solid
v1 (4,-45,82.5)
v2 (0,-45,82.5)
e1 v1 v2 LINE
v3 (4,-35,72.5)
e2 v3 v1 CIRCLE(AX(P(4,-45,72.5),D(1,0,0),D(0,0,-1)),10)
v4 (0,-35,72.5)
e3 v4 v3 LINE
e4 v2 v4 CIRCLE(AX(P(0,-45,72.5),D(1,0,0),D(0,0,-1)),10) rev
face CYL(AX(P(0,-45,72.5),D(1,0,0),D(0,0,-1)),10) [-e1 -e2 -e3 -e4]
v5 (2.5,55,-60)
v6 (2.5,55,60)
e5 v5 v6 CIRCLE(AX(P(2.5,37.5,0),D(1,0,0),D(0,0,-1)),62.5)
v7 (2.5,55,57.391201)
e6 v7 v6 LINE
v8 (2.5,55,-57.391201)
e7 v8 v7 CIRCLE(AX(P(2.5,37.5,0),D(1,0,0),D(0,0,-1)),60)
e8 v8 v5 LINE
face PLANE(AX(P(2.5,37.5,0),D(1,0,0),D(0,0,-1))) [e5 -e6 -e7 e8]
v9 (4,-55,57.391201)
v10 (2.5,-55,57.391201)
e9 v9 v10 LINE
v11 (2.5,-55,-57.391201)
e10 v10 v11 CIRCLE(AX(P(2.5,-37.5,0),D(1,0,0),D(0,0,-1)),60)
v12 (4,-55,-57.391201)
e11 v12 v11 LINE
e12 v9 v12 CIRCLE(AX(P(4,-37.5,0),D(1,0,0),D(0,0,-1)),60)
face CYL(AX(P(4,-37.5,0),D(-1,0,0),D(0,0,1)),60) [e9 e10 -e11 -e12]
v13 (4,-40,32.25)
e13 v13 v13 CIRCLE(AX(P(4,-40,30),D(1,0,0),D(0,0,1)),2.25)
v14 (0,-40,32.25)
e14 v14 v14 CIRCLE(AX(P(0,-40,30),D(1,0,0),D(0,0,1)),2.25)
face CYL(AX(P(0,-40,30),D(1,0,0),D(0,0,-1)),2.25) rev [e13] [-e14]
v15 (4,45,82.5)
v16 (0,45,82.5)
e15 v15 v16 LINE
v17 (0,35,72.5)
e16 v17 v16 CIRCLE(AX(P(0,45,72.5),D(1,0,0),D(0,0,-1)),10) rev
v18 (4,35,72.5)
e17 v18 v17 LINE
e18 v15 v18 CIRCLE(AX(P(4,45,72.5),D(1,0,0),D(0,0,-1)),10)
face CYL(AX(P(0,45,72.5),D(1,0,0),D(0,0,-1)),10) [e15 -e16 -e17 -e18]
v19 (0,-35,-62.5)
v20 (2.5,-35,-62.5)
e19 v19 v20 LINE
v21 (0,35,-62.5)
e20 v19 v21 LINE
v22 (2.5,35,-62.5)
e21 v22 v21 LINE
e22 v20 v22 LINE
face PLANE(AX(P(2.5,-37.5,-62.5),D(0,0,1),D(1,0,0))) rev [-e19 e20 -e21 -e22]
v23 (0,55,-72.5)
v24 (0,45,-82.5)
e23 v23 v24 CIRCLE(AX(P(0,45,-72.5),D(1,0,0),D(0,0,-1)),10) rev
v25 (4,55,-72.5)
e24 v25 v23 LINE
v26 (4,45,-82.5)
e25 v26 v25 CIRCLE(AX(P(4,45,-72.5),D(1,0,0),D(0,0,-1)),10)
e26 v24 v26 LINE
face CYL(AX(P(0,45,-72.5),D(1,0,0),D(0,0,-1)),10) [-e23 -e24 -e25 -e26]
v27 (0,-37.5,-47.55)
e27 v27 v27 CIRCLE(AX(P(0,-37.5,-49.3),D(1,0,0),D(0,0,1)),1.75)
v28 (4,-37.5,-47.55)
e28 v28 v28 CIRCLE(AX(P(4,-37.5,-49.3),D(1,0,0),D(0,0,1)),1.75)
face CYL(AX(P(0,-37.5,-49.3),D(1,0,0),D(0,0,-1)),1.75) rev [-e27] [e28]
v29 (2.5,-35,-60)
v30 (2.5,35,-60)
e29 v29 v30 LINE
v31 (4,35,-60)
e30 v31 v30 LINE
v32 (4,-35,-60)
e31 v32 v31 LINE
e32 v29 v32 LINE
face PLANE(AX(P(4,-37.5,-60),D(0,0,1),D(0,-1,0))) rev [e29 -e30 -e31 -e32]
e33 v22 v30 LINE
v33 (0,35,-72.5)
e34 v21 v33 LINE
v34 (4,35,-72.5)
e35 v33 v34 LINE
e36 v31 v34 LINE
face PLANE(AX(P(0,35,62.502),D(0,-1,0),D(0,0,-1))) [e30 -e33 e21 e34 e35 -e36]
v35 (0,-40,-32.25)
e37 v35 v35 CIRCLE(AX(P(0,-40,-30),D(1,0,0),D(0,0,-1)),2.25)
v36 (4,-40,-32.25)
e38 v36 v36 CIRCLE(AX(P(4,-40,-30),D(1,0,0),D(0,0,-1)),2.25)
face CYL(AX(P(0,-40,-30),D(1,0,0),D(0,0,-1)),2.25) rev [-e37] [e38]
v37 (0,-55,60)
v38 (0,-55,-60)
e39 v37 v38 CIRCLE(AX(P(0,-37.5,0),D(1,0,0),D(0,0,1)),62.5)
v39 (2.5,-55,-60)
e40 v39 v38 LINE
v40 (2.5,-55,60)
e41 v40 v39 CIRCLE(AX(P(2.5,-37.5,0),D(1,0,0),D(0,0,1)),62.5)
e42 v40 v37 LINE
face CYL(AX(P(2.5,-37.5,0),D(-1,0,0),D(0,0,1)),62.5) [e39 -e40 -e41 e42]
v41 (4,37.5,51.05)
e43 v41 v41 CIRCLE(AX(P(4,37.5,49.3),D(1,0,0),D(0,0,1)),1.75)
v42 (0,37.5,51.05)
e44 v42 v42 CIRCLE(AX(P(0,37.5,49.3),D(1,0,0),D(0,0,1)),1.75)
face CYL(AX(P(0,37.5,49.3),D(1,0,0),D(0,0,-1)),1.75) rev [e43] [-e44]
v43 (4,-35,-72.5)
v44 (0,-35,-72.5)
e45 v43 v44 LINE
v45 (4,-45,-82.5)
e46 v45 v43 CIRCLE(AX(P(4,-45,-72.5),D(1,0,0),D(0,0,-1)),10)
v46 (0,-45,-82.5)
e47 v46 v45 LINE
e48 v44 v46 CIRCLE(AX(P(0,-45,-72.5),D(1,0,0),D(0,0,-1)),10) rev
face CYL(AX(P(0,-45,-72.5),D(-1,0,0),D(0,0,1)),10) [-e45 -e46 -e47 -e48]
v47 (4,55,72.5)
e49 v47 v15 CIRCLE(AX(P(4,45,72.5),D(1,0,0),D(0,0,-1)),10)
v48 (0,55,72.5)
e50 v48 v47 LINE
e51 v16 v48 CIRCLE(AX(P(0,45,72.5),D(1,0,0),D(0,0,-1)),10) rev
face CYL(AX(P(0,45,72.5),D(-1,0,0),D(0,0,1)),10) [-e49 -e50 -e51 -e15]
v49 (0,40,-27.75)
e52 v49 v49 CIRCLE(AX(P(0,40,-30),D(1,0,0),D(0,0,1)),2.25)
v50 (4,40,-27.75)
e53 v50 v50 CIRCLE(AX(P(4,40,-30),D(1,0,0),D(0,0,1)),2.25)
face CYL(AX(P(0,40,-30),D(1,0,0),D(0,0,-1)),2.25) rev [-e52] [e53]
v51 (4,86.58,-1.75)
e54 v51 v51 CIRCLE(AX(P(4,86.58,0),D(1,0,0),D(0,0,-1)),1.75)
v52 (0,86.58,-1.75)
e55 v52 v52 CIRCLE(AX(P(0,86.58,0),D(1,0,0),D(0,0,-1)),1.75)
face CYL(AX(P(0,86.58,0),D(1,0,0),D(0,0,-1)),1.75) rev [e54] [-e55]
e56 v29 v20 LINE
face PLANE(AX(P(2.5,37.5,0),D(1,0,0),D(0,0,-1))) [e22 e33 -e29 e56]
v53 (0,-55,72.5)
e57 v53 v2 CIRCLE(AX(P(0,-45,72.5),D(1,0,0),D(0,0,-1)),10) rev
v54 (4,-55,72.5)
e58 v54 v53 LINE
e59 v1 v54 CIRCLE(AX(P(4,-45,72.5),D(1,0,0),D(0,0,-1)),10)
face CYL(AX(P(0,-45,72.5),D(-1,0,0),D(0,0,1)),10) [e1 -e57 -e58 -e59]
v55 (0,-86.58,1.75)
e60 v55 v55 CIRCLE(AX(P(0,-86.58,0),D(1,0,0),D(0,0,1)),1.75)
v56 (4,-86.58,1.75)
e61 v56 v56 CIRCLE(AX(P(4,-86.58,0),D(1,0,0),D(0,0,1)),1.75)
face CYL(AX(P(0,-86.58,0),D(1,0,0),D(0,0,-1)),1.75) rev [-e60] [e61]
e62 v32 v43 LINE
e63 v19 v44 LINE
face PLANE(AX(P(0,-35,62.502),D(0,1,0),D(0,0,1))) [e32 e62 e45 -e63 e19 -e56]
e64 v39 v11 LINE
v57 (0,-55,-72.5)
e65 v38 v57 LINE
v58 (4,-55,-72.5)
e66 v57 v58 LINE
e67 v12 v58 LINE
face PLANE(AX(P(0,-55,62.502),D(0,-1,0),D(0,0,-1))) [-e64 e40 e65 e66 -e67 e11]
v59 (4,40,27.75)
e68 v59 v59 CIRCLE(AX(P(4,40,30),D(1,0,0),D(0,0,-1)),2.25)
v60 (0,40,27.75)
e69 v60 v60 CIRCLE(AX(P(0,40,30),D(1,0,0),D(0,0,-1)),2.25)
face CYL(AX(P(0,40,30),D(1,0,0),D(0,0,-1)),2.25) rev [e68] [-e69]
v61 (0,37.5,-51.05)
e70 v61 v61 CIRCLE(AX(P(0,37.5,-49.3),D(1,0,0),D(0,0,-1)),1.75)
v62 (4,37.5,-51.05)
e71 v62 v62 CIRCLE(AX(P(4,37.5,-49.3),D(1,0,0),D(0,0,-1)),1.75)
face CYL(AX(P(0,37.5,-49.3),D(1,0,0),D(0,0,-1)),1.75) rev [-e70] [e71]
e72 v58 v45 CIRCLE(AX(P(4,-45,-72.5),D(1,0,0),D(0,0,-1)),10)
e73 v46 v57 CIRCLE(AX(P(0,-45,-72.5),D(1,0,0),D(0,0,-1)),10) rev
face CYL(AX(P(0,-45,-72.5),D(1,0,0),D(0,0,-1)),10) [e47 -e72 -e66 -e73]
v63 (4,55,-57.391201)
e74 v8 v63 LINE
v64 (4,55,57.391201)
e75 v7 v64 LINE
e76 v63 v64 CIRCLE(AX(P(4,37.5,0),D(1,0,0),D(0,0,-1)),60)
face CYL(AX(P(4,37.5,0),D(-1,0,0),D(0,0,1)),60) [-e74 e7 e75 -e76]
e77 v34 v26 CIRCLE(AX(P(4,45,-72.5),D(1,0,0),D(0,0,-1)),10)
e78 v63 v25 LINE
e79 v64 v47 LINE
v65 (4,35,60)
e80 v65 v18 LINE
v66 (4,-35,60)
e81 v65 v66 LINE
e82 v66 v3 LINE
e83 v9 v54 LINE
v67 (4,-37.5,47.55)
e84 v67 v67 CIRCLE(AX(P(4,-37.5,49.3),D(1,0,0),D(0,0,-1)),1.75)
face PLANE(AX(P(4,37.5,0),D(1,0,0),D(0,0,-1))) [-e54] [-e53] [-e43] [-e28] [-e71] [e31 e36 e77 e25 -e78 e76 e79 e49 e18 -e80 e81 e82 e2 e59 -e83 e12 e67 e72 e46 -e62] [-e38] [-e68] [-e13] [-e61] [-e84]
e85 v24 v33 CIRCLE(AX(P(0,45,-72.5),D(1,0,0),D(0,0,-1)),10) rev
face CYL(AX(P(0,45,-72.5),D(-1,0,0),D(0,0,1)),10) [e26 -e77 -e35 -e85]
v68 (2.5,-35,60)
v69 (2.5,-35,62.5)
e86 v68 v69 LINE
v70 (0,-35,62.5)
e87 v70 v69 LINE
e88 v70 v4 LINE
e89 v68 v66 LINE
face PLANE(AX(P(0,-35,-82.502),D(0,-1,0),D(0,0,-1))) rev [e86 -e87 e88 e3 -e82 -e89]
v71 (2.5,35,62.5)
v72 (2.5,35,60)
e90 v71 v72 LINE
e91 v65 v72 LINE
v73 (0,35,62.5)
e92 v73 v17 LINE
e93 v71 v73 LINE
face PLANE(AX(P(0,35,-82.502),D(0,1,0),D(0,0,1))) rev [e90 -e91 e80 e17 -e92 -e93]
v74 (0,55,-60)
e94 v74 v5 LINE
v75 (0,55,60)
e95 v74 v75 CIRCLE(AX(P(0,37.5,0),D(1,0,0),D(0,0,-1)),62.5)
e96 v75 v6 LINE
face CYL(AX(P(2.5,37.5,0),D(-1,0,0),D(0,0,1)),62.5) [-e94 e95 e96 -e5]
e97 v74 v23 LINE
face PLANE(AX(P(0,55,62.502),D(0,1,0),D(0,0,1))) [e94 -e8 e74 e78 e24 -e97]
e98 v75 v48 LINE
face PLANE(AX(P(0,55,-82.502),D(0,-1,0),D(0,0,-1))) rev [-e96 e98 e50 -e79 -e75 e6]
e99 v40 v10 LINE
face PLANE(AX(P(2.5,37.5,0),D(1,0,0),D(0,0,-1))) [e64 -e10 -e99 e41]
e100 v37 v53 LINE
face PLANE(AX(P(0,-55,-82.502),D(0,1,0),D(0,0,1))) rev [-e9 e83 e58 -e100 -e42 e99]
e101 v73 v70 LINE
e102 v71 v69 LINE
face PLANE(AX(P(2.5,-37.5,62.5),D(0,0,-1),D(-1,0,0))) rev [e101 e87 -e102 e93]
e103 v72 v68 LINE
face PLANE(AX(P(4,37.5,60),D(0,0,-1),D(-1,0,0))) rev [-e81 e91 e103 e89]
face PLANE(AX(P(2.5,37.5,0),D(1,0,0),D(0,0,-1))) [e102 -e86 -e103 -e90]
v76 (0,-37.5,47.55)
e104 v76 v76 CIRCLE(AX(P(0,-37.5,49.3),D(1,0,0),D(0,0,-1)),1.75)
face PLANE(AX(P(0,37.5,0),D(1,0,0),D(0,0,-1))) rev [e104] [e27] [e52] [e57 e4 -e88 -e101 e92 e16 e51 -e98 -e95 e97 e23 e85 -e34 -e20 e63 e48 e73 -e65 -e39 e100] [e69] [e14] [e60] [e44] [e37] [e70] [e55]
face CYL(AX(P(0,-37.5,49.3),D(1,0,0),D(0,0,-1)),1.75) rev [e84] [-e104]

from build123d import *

# Parameters (mm, degrees)
BOSS_EXTRUDE1_DEPTH  = 2.5
BOSS_EXTRUDE2_DEPTH  = 1.5
BOSS_EXTRUDE3_REACH  = 178.185
SKETCH4_W            = 4
SKETCH4_H            = 20
FILLET1_R            = 10
FILLET1_OF_MIRROR2_R = 10
SKETCH6_R            = 2.25
CUT_EXTRUDE2_DEPTH   = 130.700616807
SKETCH7_R            = 1.75
CUT_EXTRUDE3_DEPTH   = 130.700616807


with BuildPart() as part:
    # Sketch1 → Boss-Extrude1 (new body)
    with BuildSketch(Plane(origin=(0, 0, 0), x_dir=(0, 0, -1), z_dir=(1, 0, 0))):
        with BuildLine():
            Line((-62.5, -37.5), (-62.5, 37.5))
            ThreePointArc((-62.5, 37.5), (0, 100), (62.5, 37.5))
            Line((62.5, 37.5), (62.5, -37.5))
            ThreePointArc((62.5, -37.5), (0, -100), (-62.5, -37.5))
        make_face()
    extrude(amount=BOSS_EXTRUDE1_DEPTH)

    # Sketch2 → Boss-Extrude2 (add)
    with BuildSketch(Plane(origin=(2.5, 0, 0), x_dir=(0, 0, -1), z_dir=(1, 0, 0))):
        with BuildLine():
            Line((-60, 37.5), (-60, -37.5))
            ThreePointArc((-60, -37.5), (0, -97.5), (60, -37.5))
            Line((60, -37.5), (60, 37.5))
            ThreePointArc((60, 37.5), (0, 97.5), (-60, 37.5))
        make_face()
    extrude(amount=BOSS_EXTRUDE2_DEPTH)

    # Sketch4 → Boss-Extrude3 (add, up to next)
    with BuildSketch(Plane(origin=(0, 0, -82.5), x_dir=(-1, 0, 0), z_dir=(0, 0, -1)), mode=Mode.PRIVATE) as boss_extrude3_sk1:
        with Locations((-2, 45)):
            Rectangle(SKETCH4_W, SKETCH4_H)
    boss_extrude3_tool1 = extrude(boss_extrude3_sk1.sketch, amount=-BOSS_EXTRUDE3_REACH, mode=Mode.PRIVATE) - part.part
    # Sketch4 → Boss-Extrude3 (add, up to next)
    with BuildSketch(Plane(origin=(0, 0, -82.5), x_dir=(-1, 0, 0), z_dir=(0, 0, -1)), mode=Mode.PRIVATE) as boss_extrude3_sk2:
        with Locations((-2, -45)):
            Rectangle(SKETCH4_W, SKETCH4_H)
    boss_extrude3_tool2 = extrude(boss_extrude3_sk2.sketch, amount=-BOSS_EXTRUDE3_REACH, mode=Mode.PRIVATE) - part.part
    boss_extrude3_1 = boss_extrude3_tool1.solids().sort_by_distance((2, 45, -82.5))[0]
    add(boss_extrude3_1)
    boss_extrude3_2 = boss_extrude3_tool2.solids().sort_by_distance((2, -45, -82.5))[0]
    add(boss_extrude3_2)
    boss_extrude3 = boss_extrude3_1 + boss_extrude3_2  # Boss-Extrude3 as one shape, for the pattern or mirror that repeats it

    # Fillet1
    fillet1_edges = [part.edges().sort_by_distance(p)[0] for p in [
        (2, -55, -82.5),
        (2, -35, -82.5),
        (2, 35, -82.5),
        (2, 55, -82.5),
    ]]
    fillet(fillet1_edges, radius=FILLET1_R - 0.0001)  # a hair under: the kernel refuses the full size

    # Mirror2: Boss-Extrude3 across plane
    add(boss_extrude3.mirror(Plane(origin=(0, 0, 0), x_dir=(1, 0, 0), z_dir=(0, 0, -1))))

    # Fillet1 of Mirror2
    fillet1_of_mirror2_edges = [part.edges().sort_by_distance(p)[0] for p in [
        (2, -55, 82.5),
        (2, -35, 82.5),
        (2, 35, 82.5),
        (2, 55, 82.5),
    ]]
    fillet(fillet1_of_mirror2_edges, radius=FILLET1_OF_MIRROR2_R - 0.0001)  # a hair under: the kernel refuses the full size

    # Sketch6 → Cut-Extrude2 (cut, through all)
    with BuildSketch(Plane(origin=(4, 0, 0), x_dir=(0, 0, -1), z_dir=(1, 0, 0))):
        with Locations((-30, 40)):
            Circle(SKETCH6_R)
        with Locations(Location((30, 40, 0), (0, 0, 180))):
            Circle(SKETCH6_R)
        with Locations((30, -40)):
            Circle(SKETCH6_R)
        with Locations(Location((-30, -40, 0), (0, 0, 180))):
            Circle(SKETCH6_R)
    extrude(amount=-CUT_EXTRUDE2_DEPTH, mode=Mode.SUBTRACT)

    # Sketch7 → Cut-Extrude3 (cut, through all)
    with BuildSketch(Plane(origin=(4, 0, 0), x_dir=(0, 0, -1), z_dir=(1, 0, 0))):
        with Locations((0, 86.58)):
            Circle(SKETCH7_R)
        with Locations((49.3, 37.5)):
            Circle(SKETCH7_R)
        with Locations(Location((-49.3, 37.5, 0), (0, 0, 180))):
            Circle(SKETCH7_R)
        with Locations(Location((49.3, -37.5, 0), (0, 0, 180))):
            Circle(SKETCH7_R)
        with Locations(Location((0, -86.58, 0), (0, 0, 180))):
            Circle(SKETCH7_R)
        with Locations((-49.3, -37.5)):
            Circle(SKETCH7_R)
    extrude(amount=-CUT_EXTRUDE3_DEPTH, mode=Mode.SUBTRACT)


solid = part.part
